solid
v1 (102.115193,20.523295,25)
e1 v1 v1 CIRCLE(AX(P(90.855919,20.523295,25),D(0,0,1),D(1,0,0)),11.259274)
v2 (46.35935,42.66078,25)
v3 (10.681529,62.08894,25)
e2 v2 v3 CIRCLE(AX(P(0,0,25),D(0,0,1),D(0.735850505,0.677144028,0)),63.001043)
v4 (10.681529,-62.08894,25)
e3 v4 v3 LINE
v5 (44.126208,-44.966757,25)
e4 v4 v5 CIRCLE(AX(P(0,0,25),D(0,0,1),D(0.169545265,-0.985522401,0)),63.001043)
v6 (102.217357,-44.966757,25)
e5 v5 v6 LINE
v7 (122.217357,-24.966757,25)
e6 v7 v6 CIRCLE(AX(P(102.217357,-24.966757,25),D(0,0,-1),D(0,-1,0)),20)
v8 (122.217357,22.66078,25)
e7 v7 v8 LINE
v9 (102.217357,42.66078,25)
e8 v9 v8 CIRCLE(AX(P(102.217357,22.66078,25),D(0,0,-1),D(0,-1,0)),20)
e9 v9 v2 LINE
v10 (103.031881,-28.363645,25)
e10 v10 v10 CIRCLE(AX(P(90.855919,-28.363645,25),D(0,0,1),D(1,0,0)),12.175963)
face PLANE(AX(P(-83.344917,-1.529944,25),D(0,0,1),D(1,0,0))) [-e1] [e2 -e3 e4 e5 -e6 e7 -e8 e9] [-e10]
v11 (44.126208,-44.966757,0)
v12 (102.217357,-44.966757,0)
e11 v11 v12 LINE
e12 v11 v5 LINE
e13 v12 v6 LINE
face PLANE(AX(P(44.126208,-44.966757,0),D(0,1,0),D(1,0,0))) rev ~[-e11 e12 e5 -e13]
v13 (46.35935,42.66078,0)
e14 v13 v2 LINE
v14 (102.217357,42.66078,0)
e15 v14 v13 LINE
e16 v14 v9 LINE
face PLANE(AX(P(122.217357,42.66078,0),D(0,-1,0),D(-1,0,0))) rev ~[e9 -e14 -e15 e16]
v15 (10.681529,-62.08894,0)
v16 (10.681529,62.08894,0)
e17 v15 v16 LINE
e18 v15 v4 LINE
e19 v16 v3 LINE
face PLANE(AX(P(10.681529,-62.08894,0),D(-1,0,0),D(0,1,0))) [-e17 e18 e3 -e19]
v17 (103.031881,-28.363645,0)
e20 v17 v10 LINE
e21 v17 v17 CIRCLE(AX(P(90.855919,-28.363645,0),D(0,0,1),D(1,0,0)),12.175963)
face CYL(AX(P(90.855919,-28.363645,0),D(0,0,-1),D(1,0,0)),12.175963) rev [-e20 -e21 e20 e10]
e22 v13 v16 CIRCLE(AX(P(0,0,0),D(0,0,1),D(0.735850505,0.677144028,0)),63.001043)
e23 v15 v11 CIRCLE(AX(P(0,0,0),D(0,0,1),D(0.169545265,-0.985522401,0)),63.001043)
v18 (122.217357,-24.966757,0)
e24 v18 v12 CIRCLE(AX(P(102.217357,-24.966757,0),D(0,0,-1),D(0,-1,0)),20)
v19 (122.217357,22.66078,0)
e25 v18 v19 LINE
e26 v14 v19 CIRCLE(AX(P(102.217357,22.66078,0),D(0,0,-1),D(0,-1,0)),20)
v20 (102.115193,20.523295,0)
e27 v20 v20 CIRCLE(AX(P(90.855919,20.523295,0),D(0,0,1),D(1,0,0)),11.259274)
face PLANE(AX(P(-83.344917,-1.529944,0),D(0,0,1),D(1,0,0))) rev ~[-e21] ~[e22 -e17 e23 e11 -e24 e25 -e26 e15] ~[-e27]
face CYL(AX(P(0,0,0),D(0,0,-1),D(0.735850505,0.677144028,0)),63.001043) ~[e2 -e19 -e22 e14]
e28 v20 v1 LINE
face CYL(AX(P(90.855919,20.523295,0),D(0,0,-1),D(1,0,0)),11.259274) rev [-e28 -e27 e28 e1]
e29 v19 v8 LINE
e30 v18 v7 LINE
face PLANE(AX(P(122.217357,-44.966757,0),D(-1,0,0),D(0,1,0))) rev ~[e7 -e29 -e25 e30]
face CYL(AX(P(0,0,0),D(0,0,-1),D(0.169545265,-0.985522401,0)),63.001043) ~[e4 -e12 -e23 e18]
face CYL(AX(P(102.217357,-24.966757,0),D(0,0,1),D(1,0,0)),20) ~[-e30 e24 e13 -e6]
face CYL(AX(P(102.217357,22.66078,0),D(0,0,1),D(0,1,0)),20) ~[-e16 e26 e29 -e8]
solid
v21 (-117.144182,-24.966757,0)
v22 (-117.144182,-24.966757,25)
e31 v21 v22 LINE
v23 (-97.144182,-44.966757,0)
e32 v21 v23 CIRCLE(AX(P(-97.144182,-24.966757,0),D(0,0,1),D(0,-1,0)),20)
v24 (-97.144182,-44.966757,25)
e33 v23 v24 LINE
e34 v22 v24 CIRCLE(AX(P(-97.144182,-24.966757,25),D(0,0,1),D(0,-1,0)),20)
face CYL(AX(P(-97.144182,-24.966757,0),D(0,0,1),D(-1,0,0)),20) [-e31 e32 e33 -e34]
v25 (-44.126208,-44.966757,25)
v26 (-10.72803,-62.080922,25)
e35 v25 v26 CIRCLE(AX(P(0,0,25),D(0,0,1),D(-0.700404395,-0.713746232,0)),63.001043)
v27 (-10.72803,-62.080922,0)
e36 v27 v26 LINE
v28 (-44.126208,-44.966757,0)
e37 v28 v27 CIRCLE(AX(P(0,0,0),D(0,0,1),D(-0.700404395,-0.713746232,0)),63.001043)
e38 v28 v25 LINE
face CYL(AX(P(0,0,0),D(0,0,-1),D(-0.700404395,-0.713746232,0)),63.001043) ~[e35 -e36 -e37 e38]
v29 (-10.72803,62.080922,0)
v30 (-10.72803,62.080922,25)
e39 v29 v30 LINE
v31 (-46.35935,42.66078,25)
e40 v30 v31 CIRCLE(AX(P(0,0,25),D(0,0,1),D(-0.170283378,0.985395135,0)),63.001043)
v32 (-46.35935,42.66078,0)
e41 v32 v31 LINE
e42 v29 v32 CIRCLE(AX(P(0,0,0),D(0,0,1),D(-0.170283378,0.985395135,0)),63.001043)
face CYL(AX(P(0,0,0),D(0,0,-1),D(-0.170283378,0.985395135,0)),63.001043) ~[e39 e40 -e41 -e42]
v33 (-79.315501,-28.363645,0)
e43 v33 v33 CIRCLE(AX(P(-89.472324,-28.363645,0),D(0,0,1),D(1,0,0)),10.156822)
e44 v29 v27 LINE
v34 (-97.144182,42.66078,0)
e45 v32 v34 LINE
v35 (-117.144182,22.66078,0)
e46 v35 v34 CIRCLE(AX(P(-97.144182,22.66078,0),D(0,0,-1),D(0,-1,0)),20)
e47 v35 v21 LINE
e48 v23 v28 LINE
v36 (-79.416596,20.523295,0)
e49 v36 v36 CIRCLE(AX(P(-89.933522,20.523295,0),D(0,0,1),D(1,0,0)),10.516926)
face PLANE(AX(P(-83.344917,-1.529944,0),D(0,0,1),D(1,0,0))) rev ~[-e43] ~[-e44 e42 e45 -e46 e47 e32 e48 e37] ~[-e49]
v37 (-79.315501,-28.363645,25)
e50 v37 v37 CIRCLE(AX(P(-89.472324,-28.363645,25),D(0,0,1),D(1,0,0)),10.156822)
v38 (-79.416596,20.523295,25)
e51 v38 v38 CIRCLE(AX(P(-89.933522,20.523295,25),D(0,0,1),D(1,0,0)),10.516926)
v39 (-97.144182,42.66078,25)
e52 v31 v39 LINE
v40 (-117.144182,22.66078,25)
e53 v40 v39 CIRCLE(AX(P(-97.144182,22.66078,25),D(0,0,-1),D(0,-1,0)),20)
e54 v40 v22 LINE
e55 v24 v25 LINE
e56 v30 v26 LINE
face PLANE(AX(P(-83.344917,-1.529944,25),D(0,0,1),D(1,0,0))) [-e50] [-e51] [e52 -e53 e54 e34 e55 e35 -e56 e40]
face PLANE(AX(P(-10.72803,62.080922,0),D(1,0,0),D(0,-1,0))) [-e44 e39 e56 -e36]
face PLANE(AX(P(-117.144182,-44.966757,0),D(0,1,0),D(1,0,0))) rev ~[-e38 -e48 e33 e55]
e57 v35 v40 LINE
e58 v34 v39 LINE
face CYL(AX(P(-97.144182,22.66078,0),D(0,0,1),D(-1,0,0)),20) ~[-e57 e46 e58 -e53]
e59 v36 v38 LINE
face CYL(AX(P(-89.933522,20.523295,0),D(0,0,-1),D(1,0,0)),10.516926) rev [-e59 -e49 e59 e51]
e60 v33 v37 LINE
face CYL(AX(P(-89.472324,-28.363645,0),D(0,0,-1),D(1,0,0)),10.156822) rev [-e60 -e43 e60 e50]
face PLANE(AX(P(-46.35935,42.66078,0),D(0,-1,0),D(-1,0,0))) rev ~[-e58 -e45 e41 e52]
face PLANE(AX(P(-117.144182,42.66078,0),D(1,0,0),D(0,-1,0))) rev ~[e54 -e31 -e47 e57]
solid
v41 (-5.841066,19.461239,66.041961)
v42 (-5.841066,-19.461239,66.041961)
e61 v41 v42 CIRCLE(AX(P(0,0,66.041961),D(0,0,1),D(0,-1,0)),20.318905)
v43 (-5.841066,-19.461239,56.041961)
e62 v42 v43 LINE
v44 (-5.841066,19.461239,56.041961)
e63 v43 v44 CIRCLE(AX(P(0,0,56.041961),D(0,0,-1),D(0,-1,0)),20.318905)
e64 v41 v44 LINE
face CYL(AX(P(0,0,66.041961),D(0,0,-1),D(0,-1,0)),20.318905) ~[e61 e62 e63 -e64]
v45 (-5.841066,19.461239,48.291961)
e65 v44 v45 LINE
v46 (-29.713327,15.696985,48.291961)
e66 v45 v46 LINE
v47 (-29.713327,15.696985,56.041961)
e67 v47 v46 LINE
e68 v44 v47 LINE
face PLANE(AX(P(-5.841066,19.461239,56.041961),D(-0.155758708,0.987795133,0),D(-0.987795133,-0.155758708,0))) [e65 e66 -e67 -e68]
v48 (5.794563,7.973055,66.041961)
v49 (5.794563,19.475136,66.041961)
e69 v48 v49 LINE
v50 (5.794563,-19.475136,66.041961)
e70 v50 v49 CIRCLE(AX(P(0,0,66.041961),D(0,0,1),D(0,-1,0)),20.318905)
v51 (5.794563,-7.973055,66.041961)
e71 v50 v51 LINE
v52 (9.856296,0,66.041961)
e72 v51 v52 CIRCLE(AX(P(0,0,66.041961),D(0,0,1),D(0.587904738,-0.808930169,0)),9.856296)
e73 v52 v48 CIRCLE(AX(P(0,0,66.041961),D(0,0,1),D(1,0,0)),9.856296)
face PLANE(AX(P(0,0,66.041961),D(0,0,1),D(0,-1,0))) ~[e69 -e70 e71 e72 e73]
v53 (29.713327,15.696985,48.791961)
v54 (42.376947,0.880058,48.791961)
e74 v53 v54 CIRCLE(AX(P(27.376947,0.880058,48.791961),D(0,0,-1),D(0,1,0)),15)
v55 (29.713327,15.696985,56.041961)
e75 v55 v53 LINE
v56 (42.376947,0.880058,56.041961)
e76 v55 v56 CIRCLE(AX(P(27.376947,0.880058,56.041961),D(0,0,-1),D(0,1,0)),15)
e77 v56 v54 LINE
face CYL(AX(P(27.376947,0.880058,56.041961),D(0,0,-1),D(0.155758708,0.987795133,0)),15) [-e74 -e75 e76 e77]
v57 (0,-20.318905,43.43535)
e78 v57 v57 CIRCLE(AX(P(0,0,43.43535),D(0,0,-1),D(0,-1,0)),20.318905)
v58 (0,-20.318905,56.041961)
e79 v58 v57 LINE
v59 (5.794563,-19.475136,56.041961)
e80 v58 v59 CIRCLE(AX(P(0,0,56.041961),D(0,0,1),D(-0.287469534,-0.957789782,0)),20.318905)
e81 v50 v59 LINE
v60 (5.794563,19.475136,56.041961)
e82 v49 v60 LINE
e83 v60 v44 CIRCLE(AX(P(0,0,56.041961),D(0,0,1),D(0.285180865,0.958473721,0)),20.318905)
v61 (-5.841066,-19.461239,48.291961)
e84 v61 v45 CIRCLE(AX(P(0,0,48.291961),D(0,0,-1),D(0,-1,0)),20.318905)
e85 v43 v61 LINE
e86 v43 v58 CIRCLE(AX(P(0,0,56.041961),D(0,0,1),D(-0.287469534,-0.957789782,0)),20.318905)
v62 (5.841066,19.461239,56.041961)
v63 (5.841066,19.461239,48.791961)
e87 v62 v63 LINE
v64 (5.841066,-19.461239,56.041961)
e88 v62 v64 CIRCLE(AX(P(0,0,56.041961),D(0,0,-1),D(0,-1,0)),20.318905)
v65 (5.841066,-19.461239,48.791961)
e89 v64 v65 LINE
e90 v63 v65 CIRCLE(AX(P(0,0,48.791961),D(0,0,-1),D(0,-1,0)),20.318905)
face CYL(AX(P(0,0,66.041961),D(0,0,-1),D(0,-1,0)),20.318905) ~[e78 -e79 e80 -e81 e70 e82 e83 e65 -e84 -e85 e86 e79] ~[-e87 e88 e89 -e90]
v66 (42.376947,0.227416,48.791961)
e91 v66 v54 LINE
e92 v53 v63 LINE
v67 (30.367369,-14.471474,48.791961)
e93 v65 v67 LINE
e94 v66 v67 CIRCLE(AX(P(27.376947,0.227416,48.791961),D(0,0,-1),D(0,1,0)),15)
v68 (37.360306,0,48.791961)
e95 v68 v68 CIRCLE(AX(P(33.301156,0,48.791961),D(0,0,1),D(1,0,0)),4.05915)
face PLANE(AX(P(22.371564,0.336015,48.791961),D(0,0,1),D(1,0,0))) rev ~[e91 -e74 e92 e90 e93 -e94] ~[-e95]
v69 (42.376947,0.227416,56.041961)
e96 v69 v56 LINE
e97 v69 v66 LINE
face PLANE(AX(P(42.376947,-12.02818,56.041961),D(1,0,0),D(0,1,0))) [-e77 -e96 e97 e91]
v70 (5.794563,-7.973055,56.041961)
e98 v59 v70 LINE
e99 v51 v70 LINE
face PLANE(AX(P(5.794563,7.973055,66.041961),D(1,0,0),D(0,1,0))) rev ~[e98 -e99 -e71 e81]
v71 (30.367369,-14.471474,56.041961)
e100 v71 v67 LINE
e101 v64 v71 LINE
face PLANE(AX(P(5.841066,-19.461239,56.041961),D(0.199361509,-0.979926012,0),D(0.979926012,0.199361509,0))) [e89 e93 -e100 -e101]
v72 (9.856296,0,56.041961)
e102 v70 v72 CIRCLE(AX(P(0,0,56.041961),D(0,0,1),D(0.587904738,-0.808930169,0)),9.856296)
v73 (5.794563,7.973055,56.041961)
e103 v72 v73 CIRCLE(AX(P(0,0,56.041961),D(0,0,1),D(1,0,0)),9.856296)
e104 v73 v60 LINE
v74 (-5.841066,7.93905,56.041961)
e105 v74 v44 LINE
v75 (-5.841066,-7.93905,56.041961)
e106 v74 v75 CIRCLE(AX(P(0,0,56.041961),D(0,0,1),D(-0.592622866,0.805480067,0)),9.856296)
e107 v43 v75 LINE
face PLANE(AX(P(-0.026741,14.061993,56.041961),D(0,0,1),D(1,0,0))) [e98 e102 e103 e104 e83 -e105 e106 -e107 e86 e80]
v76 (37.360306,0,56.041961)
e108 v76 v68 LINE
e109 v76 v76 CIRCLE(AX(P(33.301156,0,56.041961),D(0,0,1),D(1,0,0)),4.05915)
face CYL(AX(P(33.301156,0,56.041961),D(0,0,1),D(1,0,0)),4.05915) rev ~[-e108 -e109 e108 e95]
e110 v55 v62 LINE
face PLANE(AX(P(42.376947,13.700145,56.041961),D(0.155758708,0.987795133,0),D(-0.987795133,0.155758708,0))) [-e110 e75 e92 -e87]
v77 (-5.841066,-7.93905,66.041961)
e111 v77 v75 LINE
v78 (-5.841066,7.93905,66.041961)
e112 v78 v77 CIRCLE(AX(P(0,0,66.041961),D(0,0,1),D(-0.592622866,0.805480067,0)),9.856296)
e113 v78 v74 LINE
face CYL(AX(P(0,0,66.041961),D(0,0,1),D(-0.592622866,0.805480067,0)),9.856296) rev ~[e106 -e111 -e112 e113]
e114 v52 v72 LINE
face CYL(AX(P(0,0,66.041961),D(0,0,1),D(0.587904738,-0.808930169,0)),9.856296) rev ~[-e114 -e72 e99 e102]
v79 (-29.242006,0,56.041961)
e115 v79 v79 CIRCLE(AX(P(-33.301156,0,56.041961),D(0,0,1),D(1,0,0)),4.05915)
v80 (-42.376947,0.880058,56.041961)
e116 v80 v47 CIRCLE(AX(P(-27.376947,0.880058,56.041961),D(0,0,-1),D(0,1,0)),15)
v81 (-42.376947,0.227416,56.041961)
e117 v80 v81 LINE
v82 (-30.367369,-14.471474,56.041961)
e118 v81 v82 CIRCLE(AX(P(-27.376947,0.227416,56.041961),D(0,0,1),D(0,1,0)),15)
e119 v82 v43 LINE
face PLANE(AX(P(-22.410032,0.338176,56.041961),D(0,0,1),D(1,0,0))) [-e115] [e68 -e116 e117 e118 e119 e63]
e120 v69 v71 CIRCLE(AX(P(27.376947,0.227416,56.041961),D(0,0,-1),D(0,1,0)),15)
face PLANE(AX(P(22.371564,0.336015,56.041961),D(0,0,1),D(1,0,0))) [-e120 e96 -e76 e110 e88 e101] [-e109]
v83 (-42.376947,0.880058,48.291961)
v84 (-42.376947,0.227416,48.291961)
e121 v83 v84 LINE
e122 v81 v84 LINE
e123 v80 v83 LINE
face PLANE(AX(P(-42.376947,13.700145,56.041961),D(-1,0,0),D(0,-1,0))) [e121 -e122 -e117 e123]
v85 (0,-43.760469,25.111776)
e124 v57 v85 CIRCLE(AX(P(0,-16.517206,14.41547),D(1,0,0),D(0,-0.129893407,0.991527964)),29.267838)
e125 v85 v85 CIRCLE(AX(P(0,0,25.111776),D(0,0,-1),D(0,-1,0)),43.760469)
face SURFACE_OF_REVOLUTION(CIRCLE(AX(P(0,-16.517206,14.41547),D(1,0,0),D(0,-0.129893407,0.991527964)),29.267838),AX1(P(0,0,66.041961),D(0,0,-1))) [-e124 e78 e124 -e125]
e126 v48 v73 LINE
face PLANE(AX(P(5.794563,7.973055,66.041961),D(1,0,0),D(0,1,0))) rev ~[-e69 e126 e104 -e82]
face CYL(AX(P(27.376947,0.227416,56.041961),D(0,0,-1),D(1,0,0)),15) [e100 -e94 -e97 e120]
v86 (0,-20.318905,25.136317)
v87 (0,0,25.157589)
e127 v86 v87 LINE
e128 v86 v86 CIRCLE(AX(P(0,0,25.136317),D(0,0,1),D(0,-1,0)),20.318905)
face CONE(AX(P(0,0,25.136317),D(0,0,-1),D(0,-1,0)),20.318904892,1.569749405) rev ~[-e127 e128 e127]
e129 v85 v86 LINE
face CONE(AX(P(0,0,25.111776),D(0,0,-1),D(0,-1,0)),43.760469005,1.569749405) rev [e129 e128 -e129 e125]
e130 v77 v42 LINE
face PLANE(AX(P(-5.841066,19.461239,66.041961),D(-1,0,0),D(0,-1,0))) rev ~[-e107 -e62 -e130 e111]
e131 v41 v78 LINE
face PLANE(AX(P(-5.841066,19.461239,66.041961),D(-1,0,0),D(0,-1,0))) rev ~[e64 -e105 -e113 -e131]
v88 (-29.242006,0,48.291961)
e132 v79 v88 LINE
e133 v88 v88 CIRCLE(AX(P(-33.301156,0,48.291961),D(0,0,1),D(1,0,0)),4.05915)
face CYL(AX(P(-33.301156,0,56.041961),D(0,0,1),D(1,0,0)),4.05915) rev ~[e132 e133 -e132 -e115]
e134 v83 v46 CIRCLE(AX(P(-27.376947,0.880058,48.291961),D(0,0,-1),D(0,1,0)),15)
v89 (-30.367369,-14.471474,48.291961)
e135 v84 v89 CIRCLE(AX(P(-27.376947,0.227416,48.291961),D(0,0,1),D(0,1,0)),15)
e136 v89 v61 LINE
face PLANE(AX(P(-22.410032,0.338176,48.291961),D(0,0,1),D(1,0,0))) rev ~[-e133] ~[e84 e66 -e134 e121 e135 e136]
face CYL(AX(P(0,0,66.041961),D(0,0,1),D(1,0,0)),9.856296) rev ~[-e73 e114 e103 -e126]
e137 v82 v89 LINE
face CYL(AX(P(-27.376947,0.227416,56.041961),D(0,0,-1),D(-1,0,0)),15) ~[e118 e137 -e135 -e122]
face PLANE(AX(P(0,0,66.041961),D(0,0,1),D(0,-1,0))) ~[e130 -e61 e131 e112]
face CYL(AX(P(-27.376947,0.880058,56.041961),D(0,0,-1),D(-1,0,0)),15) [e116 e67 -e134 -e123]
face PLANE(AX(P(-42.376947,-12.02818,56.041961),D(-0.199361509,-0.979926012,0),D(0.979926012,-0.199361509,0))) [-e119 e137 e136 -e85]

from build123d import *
from build123d import SkipClean  # not in build123d's __all__

# Parameters (mm, degrees)
F0_R      = 10.1568223354
F0_R_2    = 10.5169255504
F0_R_3    = 12.1759626717
F0_R_4    = 11.2592738499
F1_DEPTH  = 25
F2_R      = 20
F3_R      = 20
F4_R      = 20
F5_R      = 20
F6_DEPTH  = 84.25
F7_DEPTH  = 100
F8_DEPTH  = 95.25
F9_DEPTH  = 74.75
F14_DEPTH = 10
F15_DEPTH = 10
F16_DEPTH = 10
F17_DEPTH = 10
F18_DEPTH = 10
F19_R     = 4.0591498716
F20_DEPTH = 7.75
F21_R     = 15
F22_R     = 15
F23_DEPTH = 7.25
F24_R     = 15


with BuildPart() as f1:
    # F0 (on Top) → F1 (new body)
    with BuildSketch(Plane.XY):
        with BuildLine():
            Line((-46.3593495633, 42.660780251), (-117.1441823244, 42.660780251))
            Line((-117.1441823244, 42.660780251), (-117.1441823244, -44.9667572975))
            Line((-117.1441823244, -44.9667572975), (-44.1262076515, -44.9667572975))
            ThreePointArc((-44.1262076515, -44.9667572975), (-62.9805950299, -1.6050274871), (-46.3593495633, 42.660780251))
        make_face()
        with Locations((-89.4723236561, -28.3636450768)):
            Circle(F0_R, mode=Mode.SUBTRACT)
        with Locations((-89.9335220456, 20.5232948065)):
            Circle(F0_R_2, mode=Mode.SUBTRACT)
        with BuildLine():
            ThreePointArc((-10.7280304655, 62.0809215934), (-30.1500864357, 55.3182045215), (-46.3593495633, 42.660780251))
            Line((-46.3593495633, 42.660780251), (-10.7280304655, 42.660780251))
            Line((-10.7280304655, 42.660780251), (-10.7280304655, 62.0809215934))
        make_face()
        with BuildLine():
            Line((-10.7280304655, 42.660780251), (-46.3593495633, 42.660780251))
            ThreePointArc((-46.3593495633, 42.660780251), (-62.9805950299, -1.6050274871), (-44.1262076515, -44.9667572975))
            Line((-44.1262076515, -44.9667572975), (-10.7280304655, -44.9667572975))
            Line((-10.7280304655, -44.9667572975), (-10.7280304655, 42.660780251))
        make_face()
        with BuildLine():
            Line((-10.7280304655, 62.0809215934), (-10.7280304655, 42.660780251))
            Line((-10.7280304655, 42.660780251), (10.6815285981, 42.660780251))
            Line((10.6815285981, 42.660780251), (10.6815285981, 62.0889395172))
            ThreePointArc((10.6815285981, 62.0889395172), (-0.0235940182, 63.0010389349), (-10.7280304655, 62.0809215934))
        make_face()
        with BuildLine():
            Line((-10.7280304655, 68.533860147), (-10.7280304655, 62.0809215934))
            ThreePointArc((-10.7280304655, 62.0809215934), (-0.0235940182, 63.0010389349), (10.6815285981, 62.0889395172))
            Line((10.6815285981, 62.0889395172), (10.6815285981, 68.533860147))
            Line((10.6815285981, 68.533860147), (-10.7280304655, 68.533860147))
        make_face()
        with BuildLine():
            Line((-10.7280304655, -44.9667572975), (-44.1262076515, -44.9667572975))
            ThreePointArc((-44.1262076515, -44.9667572975), (-28.7310026755, -56.0683596052), (-10.7280304655, -62.0809215934))
            Line((-10.7280304655, -62.0809215934), (-10.7280304655, -44.9667572975))
        make_face()
        with BuildLine():
            Line((10.6815285981, 62.0889395172), (10.6815285981, 42.660780251))
            Line((10.6815285981, 42.660780251), (46.3593495633, 42.660780251))
            ThreePointArc((46.3593495633, 42.660780251), (30.1293675419, 55.3294919106), (10.6815285981, 62.0889395172))
        make_face()
        with BuildLine():
            Line((46.3593495633, 42.660780251), (10.6815285981, 42.660780251))
            Line((10.6815285981, 42.660780251), (10.6815285981, -44.9667572975))
            Line((10.6815285981, -44.9667572975), (44.1262076515, -44.9667572975))
            ThreePointArc((44.1262076515, -44.9667572975), (58.0910000982, -24.3837480948), (63.0010433529, 0))
            ThreePointArc((63.0010433529, 0), (58.6933507955, 22.8958956137), (46.3593495633, 42.660780251))
        make_face()
        with BuildLine():
            Line((10.6815285981, -44.9667572975), (-10.7280304655, -44.9667572975))
            Line((-10.7280304655, -44.9667572975), (-10.7280304655, -62.0809215934))
            ThreePointArc((-10.7280304655, -62.0809215934), (-0.0235940182, -63.0010389349), (10.6815285981, -62.0889395172))
            Line((10.6815285981, -62.0889395172), (10.6815285981, -44.9667572975))
        make_face()
        with BuildLine():
            ThreePointArc((10.6815285981, -62.0889395172), (-0.0235940182, -63.0010389349), (-10.7280304655, -62.0809215934))
            Line((-10.7280304655, -62.0809215934), (-10.7280304655, -71.3264122605))
            Line((-10.7280304655, -71.3264122605), (10.6815285981, -71.3264122605))
            Line((10.6815285981, -71.3264122605), (10.6815285981, -62.0889395172))
        make_face()
        with BuildLine():
            Line((122.2173571587, 42.660780251), (46.3593495633, 42.660780251))
            ThreePointArc((46.3593495633, 42.660780251), (58.6933507955, 22.8958956137), (63.0010433529, 0))
            ThreePointArc((63.0010433529, 0), (58.0910000982, -24.3837480948), (44.1262076515, -44.9667572975))
            Line((44.1262076515, -44.9667572975), (122.2173571587, -44.9667572975))
            Line((122.2173571587, -44.9667572975), (122.2173571587, 42.660780251))
        make_face()
        with Locations((90.8559188247, -28.3636450768)):
            Circle(F0_R_3, mode=Mode.SUBTRACT)
        with Locations((90.8559188247, 20.5232948065)):
            Circle(F0_R_4, mode=Mode.SUBTRACT)
        with BuildLine():
            Line((44.1262076515, -44.9667572975), (10.6815285981, -44.9667572975))
            Line((10.6815285981, -44.9667572975), (10.6815285981, -62.0889395172))
            ThreePointArc((10.6815285981, -62.0889395172), (28.7100029466, -56.079115492), (44.1262076515, -44.9667572975))
        make_face()
    extrude(amount=F1_DEPTH)

    # F2
    f2_edges = [f1.edges().sort_by_distance(p)[0] for p in [
        (-117.144182, -44.966757, 12.5),
    ]]
    fillet(f2_edges, radius=F2_R)

    # F3
    f3_edges = [f1.edges().sort_by_distance(p)[0] for p in [
        (-117.144182, 42.66078, 12.5),
    ]]
    fillet(f3_edges, radius=F3_R)

    # F4
    f4_edges = [f1.edges().sort_by_distance(p)[0] for p in [
        (122.217357, 42.66078, 12.5),
    ]]
    fillet(f4_edges, radius=F4_R)

    # F5
    f5_edges = [f1.edges().sort_by_distance(p)[0] for p in [
        (122.217357, -44.966757, 12.5),
    ]]
    fillet(f5_edges, radius=F5_R)

    # F0 (on Top) → F6 (cut)
    with BuildSketch(Plane.XY):
        with BuildLine():
            Line((-10.7280304655, 68.533860147), (-10.7280304655, 62.0809215934))
            ThreePointArc((-10.7280304655, 62.0809215934), (-0.0235940182, 63.0010389349), (10.6815285981, 62.0889395172))
            Line((10.6815285981, 62.0889395172), (10.6815285981, 68.533860147))
            Line((10.6815285981, 68.533860147), (-10.7280304655, 68.533860147))
        make_face()
    with SkipClean():  # cleaning this boolean's faces spoils the solid; the shape is the same uncleaned
        extrude(amount=F6_DEPTH, mode=Mode.SUBTRACT)

    # F0 (on Top) → F7 (cut)
    with BuildSketch(Plane.XY):
        with BuildLine():
            Line((-10.7280304655, 62.0809215934), (-10.7280304655, 42.660780251))
            Line((-10.7280304655, 42.660780251), (10.6815285981, 42.660780251))
            Line((10.6815285981, 42.660780251), (10.6815285981, 62.0889395172))
            ThreePointArc((10.6815285981, 62.0889395172), (-0.0235940182, 63.0010389349), (-10.7280304655, 62.0809215934))
        make_face()
    extrude(amount=F7_DEPTH, mode=Mode.SUBTRACT)

    # F0 (on Top) → F8 (cut)
    with BuildSketch(Plane.XY):
        with BuildLine():
            Line((10.6815285981, -44.9667572975), (-10.7280304655, -44.9667572975))
            Line((-10.7280304655, -44.9667572975), (-10.7280304655, -62.0809215934))
            ThreePointArc((-10.7280304655, -62.0809215934), (-0.0235940182, -63.0010389349), (10.6815285981, -62.0889395172))
            Line((10.6815285981, -62.0889395172), (10.6815285981, -44.9667572975))
        make_face()
    extrude(amount=F8_DEPTH, mode=Mode.SUBTRACT)

    # F0 (on Top) → F9 (cut)
    with BuildSketch(Plane.XY):
        with BuildLine():
            ThreePointArc((10.6815285981, -62.0889395172), (-0.0235940182, -63.0010389349), (-10.7280304655, -62.0809215934))
            Line((-10.7280304655, -62.0809215934), (-10.7280304655, -71.3264122605))
            Line((-10.7280304655, -71.3264122605), (10.6815285981, -71.3264122605))
            Line((10.6815285981, -71.3264122605), (10.6815285981, -62.0889395172))
        make_face()
    extrude(amount=F9_DEPTH, mode=Mode.SUBTRACT)


with BuildPart() as f11:
    # F10 (on Right) → F11 (revolve)
    with BuildSketch(Plane.YZ):
        Polygon((-20.3189048916, 25.1363171558), (0, 25.1575894654), (0, 66.0419613123), (-20.3189048916, 66.0419613123), (-20.3189048916, 43.4353500201), align=None)
    revolve(axis=Axis((0, 0, 45.5997753888), (0, 0, 1)))

    # F10 (on Right) → F12 (revolve)
    with BuildSketch(Plane.YZ):
        Polygon((-20.3189048916, 25.1363171558), (0, 25.1575894654), (0, 66.0419613123), (-20.3189048916, 66.0419613123), (-20.3189048916, 43.4353500201), align=None)
        with BuildLine():
            Line((-43.7604690051, 25.1117756655), (-20.3189048916, 25.1363171558))
            Line((-20.3189048916, 25.1363171558), (-20.3189048916, 43.4353500201))
            ThreePointArc((-20.3189048916, 43.4353500201), (-34.5417935809, 37.4745372766), (-43.7604690051, 25.1117756655))
        make_face()
    revolve(axis=Axis((0, 0, 66.0419613123), (0, 0, -1)))

    # F13 (on face) → F14 (cut)
    with BuildSketch(Plane.XY.offset(66.0419613123)):
        with BuildLine():
            Line((5.794562865, -7.9730548393), (5.794562865, 7.9730548393))
            ThreePointArc((5.794562865, 7.9730548393), (-0.028804987, 9.8562534739), (-5.8410661295, 7.9390496118))
            Line((-5.8410661295, 7.9390496118), (-5.8410661295, -7.9390496118))
            ThreePointArc((-5.8410661295, -7.9390496118), (-0.028804987, -9.8562534739), (5.794562865, -7.9730548393))
        make_face()
    extrude(amount=-F14_DEPTH, mode=Mode.SUBTRACT)

    # F13 (on face) → F15 (cut)
    with BuildSketch(Plane.XY.offset(66.0419613123)):
        with BuildLine():
            ThreePointArc((-5.8410661295, 7.9390496118), (-0.028804987, 9.8562534739), (5.794562865, 7.9730548393))
            Line((5.794562865, 7.9730548393), (5.794562865, 19.4751363846))
            ThreePointArc((5.794562865, 19.4751363846), (-0.0242676601, 20.3188903997), (-5.8410661295, 19.4612394894))
            Line((-5.8410661295, 19.4612394894), (-5.8410661295, 7.9390496118))
        make_face()
    extrude(amount=-F15_DEPTH, mode=Mode.SUBTRACT)

    # F13 (on face) → F16 (cut)
    with BuildSketch(Plane.XY.offset(66.0419613123)):
        with BuildLine():
            Line((5.794562865, -19.4751363846), (5.794562865, -7.9730548393))
            ThreePointArc((5.794562865, -7.9730548393), (-0.028804987, -9.8562534739), (-5.8410661295, -7.9390496118))
            Line((-5.8410661295, -7.9390496118), (-5.8410661295, -19.4612394894))
            ThreePointArc((-5.8410661295, -19.4612394894), (-0.0242676601, -20.3188903997), (5.794562865, -19.4751363846))
        make_face()
    extrude(amount=-F16_DEPTH, mode=Mode.SUBTRACT)

    # F13 (on face) → F17 (cut)
    with BuildSketch(Plane.XY.offset(66.0419613123)):
        with BuildLine():
            Line((-5.8410661295, -7.9390496118), (-5.8410661295, 7.9390496118))
            ThreePointArc((-5.8410661295, 7.9390496118), (-9.8562955652, 0), (-5.8410661295, -7.9390496118))
        make_face()
    extrude(amount=-F17_DEPTH, mode=Mode.SUBTRACT)

    # F13 (on face) → F18 (cut)
    with BuildSketch(Plane.XY.offset(66.0419613123)):
        with BuildLine():
            ThreePointArc((5.794562865, -7.9730548393), (8.7823540847, -4.4740159812), (9.8562955652, 0))
            ThreePointArc((9.8562955652, 0), (8.7823540847, 4.4740159812), (5.794562865, 7.9730548393))
            Line((5.794562865, 7.9730548393), (5.794562865, -7.9730548393))
        make_face()
    extrude(amount=-F18_DEPTH, mode=Mode.SUBTRACT)

    # F19 (on face) → F20 (join)
    with BuildSketch(Plane.XY.offset(56.0419613123)):
        with BuildLine():
            Line((-5.8410661295, 7.9390496118), (-5.8410661295, 19.4612394894))
            Line((-5.8410661295, 19.4612394894), (-42.3769466579, 13.7001445506))
            Line((-42.3769466579, 13.7001445506), (-42.3769466579, -12.0281800628))
            Line((-42.3769466579, -12.0281800628), (-5.8410661295, -19.4612394894))
            Line((-5.8410661295, -19.4612394894), (-5.8410661295, -7.9390496118))
            ThreePointArc((-5.8410661295, -7.9390496118), (-9.8562955652, 0), (-5.8410661295, 7.9390496118))
        make_face()
        with Locations((-33.3011560142, 0)):
            Circle(F19_R, mode=Mode.SUBTRACT)
    extrude(amount=-F20_DEPTH)

    # F21
    f21_edges = [f11.edges().sort_by_distance(p)[0] for p in [
        (-42.376947, -12.02818, 52.166961),
    ]]
    fillet(f21_edges, radius=F21_R)

    # F22
    f22_edges = [f11.edges().sort_by_distance(p)[0] for p in [
        (-42.376947, 13.700145, 52.166961),
    ]]
    fillet(f22_edges, radius=F22_R)

    # F19 (on face) → F23 (join)
    with BuildSketch(Plane.XY.offset(56.0419613123)):
        with BuildLine():
            Line((5.8410661295, 19.4612394894), (5.794562865, 7.9730548393))
            ThreePointArc((5.794562865, 7.9730548393), (10.5983419931, 0), (5.794562865, -7.9730548393))
            Line((5.794562865, -7.9730548393), (5.8410661295, -19.4612394894))
            Line((5.8410661295, -19.4612394894), (42.3769466579, -12.0281800628))
            Line((42.3769466579, -12.0281800628), (42.3769466579, 13.7001445506))
            Line((42.3769466579, 13.7001445506), (5.8410661295, 19.4612394894))
        make_face()
        with Locations((33.3011560142, 0)):
            Circle(F19_R, mode=Mode.SUBTRACT)
    extrude(amount=-F23_DEPTH)

    # F24
    f24_edges = [f11.edges().sort_by_distance(p)[0] for p in [
        (42.376947, 13.700145, 52.416961),
        (42.376947, -12.02818, 52.416961),
    ]]
    fillet(f24_edges, radius=F24_R)


solid = Compound([f1.part, f11.part])
